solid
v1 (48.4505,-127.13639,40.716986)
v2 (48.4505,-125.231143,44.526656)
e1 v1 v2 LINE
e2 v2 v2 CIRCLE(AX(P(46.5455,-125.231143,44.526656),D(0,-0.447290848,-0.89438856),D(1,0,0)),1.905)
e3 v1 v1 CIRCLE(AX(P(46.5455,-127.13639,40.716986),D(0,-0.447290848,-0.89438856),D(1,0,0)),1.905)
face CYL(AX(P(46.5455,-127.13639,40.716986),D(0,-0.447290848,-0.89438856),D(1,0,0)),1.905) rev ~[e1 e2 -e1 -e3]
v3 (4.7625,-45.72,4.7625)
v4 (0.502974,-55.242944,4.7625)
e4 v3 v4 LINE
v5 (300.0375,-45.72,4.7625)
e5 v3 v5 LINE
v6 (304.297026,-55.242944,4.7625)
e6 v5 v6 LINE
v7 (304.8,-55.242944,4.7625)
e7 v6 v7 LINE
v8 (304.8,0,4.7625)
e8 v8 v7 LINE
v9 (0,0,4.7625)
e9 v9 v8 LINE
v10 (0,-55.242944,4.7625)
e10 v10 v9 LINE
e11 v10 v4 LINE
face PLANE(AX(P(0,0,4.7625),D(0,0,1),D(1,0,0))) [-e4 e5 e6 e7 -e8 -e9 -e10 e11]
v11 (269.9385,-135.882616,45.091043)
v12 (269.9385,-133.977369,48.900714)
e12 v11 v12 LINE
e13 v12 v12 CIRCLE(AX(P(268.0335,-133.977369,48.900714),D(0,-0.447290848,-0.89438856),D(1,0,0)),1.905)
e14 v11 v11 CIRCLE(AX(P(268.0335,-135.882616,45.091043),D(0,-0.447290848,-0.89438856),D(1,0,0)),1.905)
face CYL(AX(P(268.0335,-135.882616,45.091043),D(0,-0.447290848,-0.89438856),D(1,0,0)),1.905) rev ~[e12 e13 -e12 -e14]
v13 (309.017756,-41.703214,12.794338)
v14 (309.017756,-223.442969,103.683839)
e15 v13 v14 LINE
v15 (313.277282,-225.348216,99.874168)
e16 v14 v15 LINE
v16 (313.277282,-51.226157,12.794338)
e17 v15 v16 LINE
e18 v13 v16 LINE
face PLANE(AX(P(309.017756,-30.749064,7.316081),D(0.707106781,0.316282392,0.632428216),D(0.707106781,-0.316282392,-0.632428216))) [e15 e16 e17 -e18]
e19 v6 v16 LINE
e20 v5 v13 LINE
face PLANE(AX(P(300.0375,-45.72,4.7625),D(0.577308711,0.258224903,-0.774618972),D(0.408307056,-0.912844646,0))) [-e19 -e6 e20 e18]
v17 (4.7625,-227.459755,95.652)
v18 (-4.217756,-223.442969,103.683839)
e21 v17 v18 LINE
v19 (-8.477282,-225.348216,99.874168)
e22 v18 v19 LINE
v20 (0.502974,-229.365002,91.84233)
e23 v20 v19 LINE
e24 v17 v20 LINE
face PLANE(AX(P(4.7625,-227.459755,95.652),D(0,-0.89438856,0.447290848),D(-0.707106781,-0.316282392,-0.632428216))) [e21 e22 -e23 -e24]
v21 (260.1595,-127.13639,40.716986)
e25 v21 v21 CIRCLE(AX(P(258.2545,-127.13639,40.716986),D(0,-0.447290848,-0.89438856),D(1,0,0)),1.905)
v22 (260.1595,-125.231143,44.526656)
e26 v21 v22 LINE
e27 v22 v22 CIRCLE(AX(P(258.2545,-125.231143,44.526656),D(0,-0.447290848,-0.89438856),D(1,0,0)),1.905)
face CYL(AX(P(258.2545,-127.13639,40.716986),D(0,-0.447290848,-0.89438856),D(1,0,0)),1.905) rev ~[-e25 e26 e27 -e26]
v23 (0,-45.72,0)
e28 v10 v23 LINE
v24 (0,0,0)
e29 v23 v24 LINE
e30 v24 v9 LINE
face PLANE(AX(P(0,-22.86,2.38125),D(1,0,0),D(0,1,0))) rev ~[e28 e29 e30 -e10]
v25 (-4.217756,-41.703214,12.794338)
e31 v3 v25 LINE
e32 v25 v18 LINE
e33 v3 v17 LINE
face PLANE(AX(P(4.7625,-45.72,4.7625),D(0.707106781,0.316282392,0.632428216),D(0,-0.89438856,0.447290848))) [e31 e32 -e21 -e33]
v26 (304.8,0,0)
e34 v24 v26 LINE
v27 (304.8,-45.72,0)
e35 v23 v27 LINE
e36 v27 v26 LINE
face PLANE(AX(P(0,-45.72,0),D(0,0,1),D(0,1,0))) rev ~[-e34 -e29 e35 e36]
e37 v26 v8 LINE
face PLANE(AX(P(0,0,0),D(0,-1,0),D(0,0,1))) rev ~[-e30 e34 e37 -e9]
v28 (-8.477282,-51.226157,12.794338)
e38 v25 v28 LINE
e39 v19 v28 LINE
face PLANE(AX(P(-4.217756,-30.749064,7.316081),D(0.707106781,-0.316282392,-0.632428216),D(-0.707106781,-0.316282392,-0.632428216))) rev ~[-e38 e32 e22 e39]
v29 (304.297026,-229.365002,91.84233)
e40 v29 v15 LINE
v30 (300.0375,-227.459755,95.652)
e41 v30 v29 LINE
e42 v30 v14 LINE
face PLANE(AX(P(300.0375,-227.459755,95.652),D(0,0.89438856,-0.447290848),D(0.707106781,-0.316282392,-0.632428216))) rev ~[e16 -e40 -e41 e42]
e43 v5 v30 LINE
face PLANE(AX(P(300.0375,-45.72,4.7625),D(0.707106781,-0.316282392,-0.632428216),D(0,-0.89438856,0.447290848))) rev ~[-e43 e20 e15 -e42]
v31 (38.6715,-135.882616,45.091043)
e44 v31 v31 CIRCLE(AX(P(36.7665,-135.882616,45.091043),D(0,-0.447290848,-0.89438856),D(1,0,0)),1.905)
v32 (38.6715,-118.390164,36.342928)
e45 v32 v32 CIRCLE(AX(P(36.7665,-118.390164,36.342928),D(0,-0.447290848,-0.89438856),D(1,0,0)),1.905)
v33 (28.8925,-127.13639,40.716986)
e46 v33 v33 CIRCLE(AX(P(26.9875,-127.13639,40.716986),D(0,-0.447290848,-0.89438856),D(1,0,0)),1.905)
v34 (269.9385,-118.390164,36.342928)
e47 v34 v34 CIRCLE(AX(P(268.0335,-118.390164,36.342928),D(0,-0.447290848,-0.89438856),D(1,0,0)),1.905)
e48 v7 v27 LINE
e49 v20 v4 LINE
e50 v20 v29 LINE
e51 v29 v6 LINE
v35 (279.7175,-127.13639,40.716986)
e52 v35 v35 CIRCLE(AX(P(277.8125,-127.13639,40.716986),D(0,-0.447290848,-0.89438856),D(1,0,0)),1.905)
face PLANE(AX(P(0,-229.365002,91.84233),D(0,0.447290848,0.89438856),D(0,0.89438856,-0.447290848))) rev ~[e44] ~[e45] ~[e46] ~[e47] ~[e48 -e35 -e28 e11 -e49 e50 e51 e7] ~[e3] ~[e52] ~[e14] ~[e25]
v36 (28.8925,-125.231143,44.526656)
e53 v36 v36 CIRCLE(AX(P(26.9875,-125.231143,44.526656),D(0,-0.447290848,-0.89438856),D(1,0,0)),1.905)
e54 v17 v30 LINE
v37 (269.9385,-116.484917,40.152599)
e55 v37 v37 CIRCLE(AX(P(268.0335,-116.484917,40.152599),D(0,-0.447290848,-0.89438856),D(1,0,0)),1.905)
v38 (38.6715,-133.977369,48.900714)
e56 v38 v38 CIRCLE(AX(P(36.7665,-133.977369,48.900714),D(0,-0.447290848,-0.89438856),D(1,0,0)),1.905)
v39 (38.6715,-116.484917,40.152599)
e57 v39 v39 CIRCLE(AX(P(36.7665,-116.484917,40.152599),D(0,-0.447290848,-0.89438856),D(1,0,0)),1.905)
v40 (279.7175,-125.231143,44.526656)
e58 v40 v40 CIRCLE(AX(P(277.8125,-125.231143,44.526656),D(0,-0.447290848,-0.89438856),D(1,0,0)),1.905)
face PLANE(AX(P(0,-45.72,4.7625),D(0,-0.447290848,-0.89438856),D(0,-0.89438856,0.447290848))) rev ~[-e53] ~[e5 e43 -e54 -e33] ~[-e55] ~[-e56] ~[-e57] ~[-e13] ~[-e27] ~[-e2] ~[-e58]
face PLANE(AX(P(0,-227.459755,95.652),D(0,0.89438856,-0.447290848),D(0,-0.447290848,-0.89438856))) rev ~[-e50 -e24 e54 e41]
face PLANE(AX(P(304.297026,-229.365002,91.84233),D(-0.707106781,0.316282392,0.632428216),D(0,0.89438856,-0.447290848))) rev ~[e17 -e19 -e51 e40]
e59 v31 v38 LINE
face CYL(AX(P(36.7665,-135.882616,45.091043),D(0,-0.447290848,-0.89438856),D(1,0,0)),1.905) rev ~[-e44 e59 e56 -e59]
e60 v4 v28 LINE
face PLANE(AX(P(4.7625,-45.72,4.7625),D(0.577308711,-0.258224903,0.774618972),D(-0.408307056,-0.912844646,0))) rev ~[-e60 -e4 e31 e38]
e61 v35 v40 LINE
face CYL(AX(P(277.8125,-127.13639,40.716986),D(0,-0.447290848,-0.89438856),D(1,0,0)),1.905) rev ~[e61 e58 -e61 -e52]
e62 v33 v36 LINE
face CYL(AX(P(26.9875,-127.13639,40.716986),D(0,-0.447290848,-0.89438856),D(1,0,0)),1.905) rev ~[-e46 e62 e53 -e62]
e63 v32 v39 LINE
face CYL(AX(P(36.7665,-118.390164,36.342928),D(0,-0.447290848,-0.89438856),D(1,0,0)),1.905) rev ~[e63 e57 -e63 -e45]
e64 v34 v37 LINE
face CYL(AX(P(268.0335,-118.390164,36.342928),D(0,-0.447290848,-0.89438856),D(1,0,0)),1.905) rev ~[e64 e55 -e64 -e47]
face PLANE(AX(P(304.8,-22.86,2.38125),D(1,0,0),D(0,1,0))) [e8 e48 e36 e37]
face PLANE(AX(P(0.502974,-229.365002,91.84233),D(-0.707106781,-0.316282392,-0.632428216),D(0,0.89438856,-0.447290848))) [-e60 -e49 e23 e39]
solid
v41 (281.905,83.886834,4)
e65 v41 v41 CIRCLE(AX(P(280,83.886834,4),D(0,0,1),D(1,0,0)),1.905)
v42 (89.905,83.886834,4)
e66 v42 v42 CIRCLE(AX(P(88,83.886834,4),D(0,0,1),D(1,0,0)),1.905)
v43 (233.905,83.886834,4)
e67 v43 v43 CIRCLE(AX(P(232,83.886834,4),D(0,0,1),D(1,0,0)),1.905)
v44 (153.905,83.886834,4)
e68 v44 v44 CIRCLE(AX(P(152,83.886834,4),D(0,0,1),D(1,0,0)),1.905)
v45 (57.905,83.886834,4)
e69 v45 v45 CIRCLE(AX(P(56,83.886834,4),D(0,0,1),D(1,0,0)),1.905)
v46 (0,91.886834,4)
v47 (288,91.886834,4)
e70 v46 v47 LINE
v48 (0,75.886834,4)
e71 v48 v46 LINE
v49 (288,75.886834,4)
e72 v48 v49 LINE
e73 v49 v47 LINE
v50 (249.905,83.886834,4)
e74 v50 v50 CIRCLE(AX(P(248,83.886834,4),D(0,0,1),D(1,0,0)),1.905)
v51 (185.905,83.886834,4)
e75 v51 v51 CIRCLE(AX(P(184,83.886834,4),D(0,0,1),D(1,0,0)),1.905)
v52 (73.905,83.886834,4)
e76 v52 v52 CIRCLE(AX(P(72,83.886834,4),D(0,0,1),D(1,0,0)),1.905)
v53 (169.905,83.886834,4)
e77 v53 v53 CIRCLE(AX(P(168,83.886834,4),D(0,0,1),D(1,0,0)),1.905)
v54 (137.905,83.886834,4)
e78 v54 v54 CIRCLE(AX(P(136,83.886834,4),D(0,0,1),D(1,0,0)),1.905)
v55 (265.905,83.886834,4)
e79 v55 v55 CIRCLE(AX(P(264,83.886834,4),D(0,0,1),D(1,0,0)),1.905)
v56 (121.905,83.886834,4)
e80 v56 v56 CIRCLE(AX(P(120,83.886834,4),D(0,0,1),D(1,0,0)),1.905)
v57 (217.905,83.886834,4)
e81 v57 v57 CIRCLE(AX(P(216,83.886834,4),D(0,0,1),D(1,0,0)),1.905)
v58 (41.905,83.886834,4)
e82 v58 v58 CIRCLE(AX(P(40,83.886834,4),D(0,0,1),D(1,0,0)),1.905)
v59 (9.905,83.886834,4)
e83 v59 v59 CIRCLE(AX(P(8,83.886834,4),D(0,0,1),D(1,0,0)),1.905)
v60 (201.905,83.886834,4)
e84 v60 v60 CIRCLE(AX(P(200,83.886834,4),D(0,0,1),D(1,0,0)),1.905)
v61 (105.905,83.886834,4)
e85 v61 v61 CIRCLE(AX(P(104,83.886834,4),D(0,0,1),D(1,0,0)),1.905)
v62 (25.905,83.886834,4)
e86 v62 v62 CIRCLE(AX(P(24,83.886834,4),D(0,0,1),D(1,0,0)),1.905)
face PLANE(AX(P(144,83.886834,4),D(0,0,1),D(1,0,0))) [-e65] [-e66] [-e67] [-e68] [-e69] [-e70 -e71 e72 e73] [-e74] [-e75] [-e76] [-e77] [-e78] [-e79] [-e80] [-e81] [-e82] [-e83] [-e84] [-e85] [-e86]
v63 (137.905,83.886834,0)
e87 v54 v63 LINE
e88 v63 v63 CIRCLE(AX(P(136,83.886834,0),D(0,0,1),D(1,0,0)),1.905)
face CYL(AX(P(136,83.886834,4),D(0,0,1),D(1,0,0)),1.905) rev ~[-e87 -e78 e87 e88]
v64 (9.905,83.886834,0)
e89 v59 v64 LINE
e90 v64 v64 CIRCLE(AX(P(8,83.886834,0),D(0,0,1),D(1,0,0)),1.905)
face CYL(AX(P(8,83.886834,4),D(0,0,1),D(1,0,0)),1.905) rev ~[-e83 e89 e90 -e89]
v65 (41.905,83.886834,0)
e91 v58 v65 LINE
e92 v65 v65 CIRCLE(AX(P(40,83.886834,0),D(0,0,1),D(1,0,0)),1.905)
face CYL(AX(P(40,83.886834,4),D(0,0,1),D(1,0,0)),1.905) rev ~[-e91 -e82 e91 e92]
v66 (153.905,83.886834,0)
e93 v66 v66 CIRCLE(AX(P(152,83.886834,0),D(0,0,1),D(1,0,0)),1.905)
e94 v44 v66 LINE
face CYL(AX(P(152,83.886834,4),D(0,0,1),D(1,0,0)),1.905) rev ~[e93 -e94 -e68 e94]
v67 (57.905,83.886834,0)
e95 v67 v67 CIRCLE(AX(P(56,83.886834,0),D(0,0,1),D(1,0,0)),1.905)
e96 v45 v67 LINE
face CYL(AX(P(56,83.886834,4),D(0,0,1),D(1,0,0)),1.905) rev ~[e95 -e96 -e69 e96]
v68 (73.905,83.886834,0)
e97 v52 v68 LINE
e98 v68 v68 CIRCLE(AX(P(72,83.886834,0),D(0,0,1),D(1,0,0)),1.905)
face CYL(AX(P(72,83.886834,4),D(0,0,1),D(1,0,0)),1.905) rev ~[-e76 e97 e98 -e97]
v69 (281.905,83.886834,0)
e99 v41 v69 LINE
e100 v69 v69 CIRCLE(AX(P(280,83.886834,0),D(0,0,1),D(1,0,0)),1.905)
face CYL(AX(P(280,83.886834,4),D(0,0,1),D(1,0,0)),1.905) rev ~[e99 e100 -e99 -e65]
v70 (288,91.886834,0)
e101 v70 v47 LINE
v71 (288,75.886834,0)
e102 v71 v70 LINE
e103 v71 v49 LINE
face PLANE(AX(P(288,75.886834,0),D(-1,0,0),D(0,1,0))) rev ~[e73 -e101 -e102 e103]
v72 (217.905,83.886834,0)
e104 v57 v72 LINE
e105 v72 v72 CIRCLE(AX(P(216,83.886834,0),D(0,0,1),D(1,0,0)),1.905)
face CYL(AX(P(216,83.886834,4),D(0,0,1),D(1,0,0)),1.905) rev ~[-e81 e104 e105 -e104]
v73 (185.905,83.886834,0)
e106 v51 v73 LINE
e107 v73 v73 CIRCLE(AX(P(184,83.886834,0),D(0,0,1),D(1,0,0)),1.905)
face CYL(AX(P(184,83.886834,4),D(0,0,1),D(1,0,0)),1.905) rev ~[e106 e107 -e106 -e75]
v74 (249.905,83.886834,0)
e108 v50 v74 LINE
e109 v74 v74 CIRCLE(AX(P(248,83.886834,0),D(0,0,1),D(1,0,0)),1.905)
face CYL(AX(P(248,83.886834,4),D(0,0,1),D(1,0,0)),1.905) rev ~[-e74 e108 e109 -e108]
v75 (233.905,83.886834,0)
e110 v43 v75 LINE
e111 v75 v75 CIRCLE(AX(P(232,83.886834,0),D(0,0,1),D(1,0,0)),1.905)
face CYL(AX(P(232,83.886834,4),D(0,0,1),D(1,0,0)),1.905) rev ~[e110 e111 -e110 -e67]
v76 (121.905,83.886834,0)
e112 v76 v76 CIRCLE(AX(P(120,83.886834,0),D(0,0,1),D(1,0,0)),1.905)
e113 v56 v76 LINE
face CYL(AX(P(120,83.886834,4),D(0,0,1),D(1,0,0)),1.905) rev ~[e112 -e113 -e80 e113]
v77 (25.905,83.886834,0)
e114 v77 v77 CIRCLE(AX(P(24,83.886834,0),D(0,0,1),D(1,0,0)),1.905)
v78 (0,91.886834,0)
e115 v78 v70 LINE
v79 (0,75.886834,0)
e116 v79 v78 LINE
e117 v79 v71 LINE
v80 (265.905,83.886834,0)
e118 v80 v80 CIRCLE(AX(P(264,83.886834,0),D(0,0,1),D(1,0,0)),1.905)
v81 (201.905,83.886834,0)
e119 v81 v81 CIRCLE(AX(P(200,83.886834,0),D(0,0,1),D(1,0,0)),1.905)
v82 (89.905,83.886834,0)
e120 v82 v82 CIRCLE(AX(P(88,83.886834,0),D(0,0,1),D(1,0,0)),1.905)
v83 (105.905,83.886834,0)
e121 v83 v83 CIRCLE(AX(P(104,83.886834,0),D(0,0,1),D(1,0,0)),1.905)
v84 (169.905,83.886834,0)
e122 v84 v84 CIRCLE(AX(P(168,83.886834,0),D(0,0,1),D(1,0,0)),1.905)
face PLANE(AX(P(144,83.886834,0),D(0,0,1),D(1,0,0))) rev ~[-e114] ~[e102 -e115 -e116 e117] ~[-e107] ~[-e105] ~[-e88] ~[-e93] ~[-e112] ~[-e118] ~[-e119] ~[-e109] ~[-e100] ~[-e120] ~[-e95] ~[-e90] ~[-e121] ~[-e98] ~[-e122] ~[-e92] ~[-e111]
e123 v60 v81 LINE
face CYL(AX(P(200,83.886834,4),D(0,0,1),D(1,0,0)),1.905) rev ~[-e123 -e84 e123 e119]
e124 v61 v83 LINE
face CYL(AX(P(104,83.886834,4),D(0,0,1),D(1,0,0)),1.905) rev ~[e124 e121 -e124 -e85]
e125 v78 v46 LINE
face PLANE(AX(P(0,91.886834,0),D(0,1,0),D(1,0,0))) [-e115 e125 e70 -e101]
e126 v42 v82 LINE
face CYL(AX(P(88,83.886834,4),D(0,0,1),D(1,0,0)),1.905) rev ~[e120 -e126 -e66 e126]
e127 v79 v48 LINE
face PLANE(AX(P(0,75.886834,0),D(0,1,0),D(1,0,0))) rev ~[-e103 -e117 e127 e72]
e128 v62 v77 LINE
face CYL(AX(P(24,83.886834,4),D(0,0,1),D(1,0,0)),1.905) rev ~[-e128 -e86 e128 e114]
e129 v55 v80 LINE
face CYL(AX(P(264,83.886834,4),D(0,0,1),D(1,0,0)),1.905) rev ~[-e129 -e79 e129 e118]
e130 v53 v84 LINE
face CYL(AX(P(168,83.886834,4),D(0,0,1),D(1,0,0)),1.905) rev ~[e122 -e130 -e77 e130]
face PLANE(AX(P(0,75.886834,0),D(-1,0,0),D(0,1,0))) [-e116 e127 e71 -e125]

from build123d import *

# Parameters (mm, degrees)
F0_W        = 45.72
F0_H        = 4.7625
F1_DEPTH    = 304.8
F2_T4_DEPTH = 227.6952804604
F2_T9_DEPTH = 227.6952804604
F3_DEPTH    = 12.7
F4_DEPTH    = 12.7
F5_W        = 288
F5_H        = 16
F6_DEPTH    = 4
F7_R        = 1.905
F8_DEPTH    = 4
F9_R        = 1.905
F10_DEPTH   = 4.2595255188


# Not quite as in the source:
# - a fillet or chamfer that OpenCascade refuses, or shapes differently, is made with other operations: its cross-section is extruded or revolved along the edge and cut away or added


with BuildPart() as f1:
    # F0 (on Right) → F1 (new body)
    with BuildSketch(Plane.YZ):
        with Locations((-22.86, 2.38125)):
            Rectangle(F0_W, F0_H)
        Polygon((-229.3650022503, 91.8423295021), (-45.72, 0), (-45.72, 4.7625), (-227.4597554672, 95.6520003987), align=None)
    extrude(amount=F1_DEPTH)

    # F2: chamfer of 4.7625 on 2 edges, made by hand


with BuildPart() as f2_tool2:
    # F2_s3 → F2_t4 (new body)
    with BuildSketch(Plane(origin=(0, -27.523938077, 13.764940832), x_dir=(1, 0, 0), z_dir=(0, -0.8943885604, 0.4472908484))):
        Polygon((300.0375, -16.1906120709), (304.8, -20.9531120709), (304.8, -16.1906120709), align=None)
    extrude(amount=F2_T4_DEPTH)

    split(bisect_by=Plane.XY.offset(4.7625), keep=Keep.TOP)


with BuildPart() as f1_1:
    add(f1.part)

    # F2_t1: cut F2_tool2
    add(f2_tool2.part, mode=Mode.SUBTRACT)


with BuildPart() as f2_tool7:
    # F2_s8 → F2_t9 (new body)
    with BuildSketch(Plane(origin=(0, -27.523938077, 13.764940832), x_dir=(1, 0, 0), z_dir=(0, -0.8943885604, 0.4472908484))):
        Polygon((4.7625, -16.1906120709), (0, -20.9531120709), (0, -16.1906120709), align=None)
    extrude(amount=F2_T9_DEPTH)

    split(bisect_by=Plane.XY.offset(4.7625), keep=Keep.TOP)


with BuildPart() as f1_2:
    add(f1_1.part)

    # F2_t6: cut F2_tool7
    add(f2_tool7.part, mode=Mode.SUBTRACT)

    # F3 (add): a face of the model
    f3_faces = [f1_2.faces().sort_by_distance(p)[0] for p in [
        (302.1520659552, -139.4265390225, 49.2616283991),
    ]]
    extrude(f3_faces, amount=F3_DEPTH)

    # F4 (add): a face of the model
    f4_faces = [f1_2.faces().sort_by_distance(p)[0] for p in [
        (2.6479340448, -139.4265390225, 49.2616283991),
    ]]
    extrude(f4_faces, amount=F4_DEPTH)

    # F9 (on face) → F10 (cut, through all)
    with BuildSketch(Plane(origin=(0, -9.1471593928, -18.2903691182), x_dir=(1, 0, 0), z_dir=(0, -0.4472908484, -0.8943885604))):
        with Locations((36.7665, 122.1426676457)):
            Circle(F9_R)
        with Locations((46.5455, 131.9216676457)):
            Circle(F9_R)
        with Locations((36.7665, 141.7006676457)):
            Circle(F9_R)
        with Locations((26.9875, 131.9216676457)):
            Circle(F9_R)
        with Locations((277.8125, 131.9216676457)):
            Circle(F9_R)
        with Locations((258.2545, 131.9216676457)):
            Circle(F9_R)
        with Locations((268.0335, 122.1426676457)):
            Circle(F9_R)
        with Locations((268.0335, 141.7006676457)):
            Circle(F9_R)
    extrude(amount=-F10_DEPTH, mode=Mode.SUBTRACT)


with BuildPart() as f6:
    # F5 (on Top) → F6 (new body)
    with BuildSketch(Plane.XY):
        with Locations((144, 83.8868339212)):
            Rectangle(F5_W, F5_H)
    extrude(amount=F6_DEPTH)

    # F7 (on face) → F8 (cut, through all)
    with BuildSketch(Plane.XY.offset(4)):
        with Locations((8, 83.8868339212)):
            Circle(F7_R)
        with Locations((24, 83.8868339212)):
            Circle(F7_R)
        with Locations((40, 83.8868339212)):
            Circle(F7_R)
        with Locations((56, 83.8868339212)):
            Circle(F7_R)
        with Locations((72, 83.8868339212)):
            Circle(F7_R)
        with Locations((88, 83.8868339212)):
            Circle(F7_R)
        with Locations((104, 83.8868339212)):
            Circle(F7_R)
        with Locations((120, 83.8868339212)):
            Circle(F7_R)
        with Locations((136, 83.8868339212)):
            Circle(F7_R)
        with Locations((152, 83.8868339212)):
            Circle(F7_R)
        with Locations((168, 83.8868339212)):
            Circle(F7_R)
        with Locations((184, 83.8868339212)):
            Circle(F7_R)
        with Locations((200, 83.8868339212)):
            Circle(F7_R)
        with Locations((216, 83.8868339212)):
            Circle(F7_R)
        with Locations((232, 83.8868339212)):
            Circle(F7_R)
        with Locations((248, 83.8868339212)):
            Circle(F7_R)
        with Locations((264, 83.8868339212)):
            Circle(F7_R)
        with Locations((280, 83.8868339212)):
            Circle(F7_R)
    extrude(amount=-F8_DEPTH, mode=Mode.SUBTRACT)


solid = Compound([f1_2.part, f6.part])
